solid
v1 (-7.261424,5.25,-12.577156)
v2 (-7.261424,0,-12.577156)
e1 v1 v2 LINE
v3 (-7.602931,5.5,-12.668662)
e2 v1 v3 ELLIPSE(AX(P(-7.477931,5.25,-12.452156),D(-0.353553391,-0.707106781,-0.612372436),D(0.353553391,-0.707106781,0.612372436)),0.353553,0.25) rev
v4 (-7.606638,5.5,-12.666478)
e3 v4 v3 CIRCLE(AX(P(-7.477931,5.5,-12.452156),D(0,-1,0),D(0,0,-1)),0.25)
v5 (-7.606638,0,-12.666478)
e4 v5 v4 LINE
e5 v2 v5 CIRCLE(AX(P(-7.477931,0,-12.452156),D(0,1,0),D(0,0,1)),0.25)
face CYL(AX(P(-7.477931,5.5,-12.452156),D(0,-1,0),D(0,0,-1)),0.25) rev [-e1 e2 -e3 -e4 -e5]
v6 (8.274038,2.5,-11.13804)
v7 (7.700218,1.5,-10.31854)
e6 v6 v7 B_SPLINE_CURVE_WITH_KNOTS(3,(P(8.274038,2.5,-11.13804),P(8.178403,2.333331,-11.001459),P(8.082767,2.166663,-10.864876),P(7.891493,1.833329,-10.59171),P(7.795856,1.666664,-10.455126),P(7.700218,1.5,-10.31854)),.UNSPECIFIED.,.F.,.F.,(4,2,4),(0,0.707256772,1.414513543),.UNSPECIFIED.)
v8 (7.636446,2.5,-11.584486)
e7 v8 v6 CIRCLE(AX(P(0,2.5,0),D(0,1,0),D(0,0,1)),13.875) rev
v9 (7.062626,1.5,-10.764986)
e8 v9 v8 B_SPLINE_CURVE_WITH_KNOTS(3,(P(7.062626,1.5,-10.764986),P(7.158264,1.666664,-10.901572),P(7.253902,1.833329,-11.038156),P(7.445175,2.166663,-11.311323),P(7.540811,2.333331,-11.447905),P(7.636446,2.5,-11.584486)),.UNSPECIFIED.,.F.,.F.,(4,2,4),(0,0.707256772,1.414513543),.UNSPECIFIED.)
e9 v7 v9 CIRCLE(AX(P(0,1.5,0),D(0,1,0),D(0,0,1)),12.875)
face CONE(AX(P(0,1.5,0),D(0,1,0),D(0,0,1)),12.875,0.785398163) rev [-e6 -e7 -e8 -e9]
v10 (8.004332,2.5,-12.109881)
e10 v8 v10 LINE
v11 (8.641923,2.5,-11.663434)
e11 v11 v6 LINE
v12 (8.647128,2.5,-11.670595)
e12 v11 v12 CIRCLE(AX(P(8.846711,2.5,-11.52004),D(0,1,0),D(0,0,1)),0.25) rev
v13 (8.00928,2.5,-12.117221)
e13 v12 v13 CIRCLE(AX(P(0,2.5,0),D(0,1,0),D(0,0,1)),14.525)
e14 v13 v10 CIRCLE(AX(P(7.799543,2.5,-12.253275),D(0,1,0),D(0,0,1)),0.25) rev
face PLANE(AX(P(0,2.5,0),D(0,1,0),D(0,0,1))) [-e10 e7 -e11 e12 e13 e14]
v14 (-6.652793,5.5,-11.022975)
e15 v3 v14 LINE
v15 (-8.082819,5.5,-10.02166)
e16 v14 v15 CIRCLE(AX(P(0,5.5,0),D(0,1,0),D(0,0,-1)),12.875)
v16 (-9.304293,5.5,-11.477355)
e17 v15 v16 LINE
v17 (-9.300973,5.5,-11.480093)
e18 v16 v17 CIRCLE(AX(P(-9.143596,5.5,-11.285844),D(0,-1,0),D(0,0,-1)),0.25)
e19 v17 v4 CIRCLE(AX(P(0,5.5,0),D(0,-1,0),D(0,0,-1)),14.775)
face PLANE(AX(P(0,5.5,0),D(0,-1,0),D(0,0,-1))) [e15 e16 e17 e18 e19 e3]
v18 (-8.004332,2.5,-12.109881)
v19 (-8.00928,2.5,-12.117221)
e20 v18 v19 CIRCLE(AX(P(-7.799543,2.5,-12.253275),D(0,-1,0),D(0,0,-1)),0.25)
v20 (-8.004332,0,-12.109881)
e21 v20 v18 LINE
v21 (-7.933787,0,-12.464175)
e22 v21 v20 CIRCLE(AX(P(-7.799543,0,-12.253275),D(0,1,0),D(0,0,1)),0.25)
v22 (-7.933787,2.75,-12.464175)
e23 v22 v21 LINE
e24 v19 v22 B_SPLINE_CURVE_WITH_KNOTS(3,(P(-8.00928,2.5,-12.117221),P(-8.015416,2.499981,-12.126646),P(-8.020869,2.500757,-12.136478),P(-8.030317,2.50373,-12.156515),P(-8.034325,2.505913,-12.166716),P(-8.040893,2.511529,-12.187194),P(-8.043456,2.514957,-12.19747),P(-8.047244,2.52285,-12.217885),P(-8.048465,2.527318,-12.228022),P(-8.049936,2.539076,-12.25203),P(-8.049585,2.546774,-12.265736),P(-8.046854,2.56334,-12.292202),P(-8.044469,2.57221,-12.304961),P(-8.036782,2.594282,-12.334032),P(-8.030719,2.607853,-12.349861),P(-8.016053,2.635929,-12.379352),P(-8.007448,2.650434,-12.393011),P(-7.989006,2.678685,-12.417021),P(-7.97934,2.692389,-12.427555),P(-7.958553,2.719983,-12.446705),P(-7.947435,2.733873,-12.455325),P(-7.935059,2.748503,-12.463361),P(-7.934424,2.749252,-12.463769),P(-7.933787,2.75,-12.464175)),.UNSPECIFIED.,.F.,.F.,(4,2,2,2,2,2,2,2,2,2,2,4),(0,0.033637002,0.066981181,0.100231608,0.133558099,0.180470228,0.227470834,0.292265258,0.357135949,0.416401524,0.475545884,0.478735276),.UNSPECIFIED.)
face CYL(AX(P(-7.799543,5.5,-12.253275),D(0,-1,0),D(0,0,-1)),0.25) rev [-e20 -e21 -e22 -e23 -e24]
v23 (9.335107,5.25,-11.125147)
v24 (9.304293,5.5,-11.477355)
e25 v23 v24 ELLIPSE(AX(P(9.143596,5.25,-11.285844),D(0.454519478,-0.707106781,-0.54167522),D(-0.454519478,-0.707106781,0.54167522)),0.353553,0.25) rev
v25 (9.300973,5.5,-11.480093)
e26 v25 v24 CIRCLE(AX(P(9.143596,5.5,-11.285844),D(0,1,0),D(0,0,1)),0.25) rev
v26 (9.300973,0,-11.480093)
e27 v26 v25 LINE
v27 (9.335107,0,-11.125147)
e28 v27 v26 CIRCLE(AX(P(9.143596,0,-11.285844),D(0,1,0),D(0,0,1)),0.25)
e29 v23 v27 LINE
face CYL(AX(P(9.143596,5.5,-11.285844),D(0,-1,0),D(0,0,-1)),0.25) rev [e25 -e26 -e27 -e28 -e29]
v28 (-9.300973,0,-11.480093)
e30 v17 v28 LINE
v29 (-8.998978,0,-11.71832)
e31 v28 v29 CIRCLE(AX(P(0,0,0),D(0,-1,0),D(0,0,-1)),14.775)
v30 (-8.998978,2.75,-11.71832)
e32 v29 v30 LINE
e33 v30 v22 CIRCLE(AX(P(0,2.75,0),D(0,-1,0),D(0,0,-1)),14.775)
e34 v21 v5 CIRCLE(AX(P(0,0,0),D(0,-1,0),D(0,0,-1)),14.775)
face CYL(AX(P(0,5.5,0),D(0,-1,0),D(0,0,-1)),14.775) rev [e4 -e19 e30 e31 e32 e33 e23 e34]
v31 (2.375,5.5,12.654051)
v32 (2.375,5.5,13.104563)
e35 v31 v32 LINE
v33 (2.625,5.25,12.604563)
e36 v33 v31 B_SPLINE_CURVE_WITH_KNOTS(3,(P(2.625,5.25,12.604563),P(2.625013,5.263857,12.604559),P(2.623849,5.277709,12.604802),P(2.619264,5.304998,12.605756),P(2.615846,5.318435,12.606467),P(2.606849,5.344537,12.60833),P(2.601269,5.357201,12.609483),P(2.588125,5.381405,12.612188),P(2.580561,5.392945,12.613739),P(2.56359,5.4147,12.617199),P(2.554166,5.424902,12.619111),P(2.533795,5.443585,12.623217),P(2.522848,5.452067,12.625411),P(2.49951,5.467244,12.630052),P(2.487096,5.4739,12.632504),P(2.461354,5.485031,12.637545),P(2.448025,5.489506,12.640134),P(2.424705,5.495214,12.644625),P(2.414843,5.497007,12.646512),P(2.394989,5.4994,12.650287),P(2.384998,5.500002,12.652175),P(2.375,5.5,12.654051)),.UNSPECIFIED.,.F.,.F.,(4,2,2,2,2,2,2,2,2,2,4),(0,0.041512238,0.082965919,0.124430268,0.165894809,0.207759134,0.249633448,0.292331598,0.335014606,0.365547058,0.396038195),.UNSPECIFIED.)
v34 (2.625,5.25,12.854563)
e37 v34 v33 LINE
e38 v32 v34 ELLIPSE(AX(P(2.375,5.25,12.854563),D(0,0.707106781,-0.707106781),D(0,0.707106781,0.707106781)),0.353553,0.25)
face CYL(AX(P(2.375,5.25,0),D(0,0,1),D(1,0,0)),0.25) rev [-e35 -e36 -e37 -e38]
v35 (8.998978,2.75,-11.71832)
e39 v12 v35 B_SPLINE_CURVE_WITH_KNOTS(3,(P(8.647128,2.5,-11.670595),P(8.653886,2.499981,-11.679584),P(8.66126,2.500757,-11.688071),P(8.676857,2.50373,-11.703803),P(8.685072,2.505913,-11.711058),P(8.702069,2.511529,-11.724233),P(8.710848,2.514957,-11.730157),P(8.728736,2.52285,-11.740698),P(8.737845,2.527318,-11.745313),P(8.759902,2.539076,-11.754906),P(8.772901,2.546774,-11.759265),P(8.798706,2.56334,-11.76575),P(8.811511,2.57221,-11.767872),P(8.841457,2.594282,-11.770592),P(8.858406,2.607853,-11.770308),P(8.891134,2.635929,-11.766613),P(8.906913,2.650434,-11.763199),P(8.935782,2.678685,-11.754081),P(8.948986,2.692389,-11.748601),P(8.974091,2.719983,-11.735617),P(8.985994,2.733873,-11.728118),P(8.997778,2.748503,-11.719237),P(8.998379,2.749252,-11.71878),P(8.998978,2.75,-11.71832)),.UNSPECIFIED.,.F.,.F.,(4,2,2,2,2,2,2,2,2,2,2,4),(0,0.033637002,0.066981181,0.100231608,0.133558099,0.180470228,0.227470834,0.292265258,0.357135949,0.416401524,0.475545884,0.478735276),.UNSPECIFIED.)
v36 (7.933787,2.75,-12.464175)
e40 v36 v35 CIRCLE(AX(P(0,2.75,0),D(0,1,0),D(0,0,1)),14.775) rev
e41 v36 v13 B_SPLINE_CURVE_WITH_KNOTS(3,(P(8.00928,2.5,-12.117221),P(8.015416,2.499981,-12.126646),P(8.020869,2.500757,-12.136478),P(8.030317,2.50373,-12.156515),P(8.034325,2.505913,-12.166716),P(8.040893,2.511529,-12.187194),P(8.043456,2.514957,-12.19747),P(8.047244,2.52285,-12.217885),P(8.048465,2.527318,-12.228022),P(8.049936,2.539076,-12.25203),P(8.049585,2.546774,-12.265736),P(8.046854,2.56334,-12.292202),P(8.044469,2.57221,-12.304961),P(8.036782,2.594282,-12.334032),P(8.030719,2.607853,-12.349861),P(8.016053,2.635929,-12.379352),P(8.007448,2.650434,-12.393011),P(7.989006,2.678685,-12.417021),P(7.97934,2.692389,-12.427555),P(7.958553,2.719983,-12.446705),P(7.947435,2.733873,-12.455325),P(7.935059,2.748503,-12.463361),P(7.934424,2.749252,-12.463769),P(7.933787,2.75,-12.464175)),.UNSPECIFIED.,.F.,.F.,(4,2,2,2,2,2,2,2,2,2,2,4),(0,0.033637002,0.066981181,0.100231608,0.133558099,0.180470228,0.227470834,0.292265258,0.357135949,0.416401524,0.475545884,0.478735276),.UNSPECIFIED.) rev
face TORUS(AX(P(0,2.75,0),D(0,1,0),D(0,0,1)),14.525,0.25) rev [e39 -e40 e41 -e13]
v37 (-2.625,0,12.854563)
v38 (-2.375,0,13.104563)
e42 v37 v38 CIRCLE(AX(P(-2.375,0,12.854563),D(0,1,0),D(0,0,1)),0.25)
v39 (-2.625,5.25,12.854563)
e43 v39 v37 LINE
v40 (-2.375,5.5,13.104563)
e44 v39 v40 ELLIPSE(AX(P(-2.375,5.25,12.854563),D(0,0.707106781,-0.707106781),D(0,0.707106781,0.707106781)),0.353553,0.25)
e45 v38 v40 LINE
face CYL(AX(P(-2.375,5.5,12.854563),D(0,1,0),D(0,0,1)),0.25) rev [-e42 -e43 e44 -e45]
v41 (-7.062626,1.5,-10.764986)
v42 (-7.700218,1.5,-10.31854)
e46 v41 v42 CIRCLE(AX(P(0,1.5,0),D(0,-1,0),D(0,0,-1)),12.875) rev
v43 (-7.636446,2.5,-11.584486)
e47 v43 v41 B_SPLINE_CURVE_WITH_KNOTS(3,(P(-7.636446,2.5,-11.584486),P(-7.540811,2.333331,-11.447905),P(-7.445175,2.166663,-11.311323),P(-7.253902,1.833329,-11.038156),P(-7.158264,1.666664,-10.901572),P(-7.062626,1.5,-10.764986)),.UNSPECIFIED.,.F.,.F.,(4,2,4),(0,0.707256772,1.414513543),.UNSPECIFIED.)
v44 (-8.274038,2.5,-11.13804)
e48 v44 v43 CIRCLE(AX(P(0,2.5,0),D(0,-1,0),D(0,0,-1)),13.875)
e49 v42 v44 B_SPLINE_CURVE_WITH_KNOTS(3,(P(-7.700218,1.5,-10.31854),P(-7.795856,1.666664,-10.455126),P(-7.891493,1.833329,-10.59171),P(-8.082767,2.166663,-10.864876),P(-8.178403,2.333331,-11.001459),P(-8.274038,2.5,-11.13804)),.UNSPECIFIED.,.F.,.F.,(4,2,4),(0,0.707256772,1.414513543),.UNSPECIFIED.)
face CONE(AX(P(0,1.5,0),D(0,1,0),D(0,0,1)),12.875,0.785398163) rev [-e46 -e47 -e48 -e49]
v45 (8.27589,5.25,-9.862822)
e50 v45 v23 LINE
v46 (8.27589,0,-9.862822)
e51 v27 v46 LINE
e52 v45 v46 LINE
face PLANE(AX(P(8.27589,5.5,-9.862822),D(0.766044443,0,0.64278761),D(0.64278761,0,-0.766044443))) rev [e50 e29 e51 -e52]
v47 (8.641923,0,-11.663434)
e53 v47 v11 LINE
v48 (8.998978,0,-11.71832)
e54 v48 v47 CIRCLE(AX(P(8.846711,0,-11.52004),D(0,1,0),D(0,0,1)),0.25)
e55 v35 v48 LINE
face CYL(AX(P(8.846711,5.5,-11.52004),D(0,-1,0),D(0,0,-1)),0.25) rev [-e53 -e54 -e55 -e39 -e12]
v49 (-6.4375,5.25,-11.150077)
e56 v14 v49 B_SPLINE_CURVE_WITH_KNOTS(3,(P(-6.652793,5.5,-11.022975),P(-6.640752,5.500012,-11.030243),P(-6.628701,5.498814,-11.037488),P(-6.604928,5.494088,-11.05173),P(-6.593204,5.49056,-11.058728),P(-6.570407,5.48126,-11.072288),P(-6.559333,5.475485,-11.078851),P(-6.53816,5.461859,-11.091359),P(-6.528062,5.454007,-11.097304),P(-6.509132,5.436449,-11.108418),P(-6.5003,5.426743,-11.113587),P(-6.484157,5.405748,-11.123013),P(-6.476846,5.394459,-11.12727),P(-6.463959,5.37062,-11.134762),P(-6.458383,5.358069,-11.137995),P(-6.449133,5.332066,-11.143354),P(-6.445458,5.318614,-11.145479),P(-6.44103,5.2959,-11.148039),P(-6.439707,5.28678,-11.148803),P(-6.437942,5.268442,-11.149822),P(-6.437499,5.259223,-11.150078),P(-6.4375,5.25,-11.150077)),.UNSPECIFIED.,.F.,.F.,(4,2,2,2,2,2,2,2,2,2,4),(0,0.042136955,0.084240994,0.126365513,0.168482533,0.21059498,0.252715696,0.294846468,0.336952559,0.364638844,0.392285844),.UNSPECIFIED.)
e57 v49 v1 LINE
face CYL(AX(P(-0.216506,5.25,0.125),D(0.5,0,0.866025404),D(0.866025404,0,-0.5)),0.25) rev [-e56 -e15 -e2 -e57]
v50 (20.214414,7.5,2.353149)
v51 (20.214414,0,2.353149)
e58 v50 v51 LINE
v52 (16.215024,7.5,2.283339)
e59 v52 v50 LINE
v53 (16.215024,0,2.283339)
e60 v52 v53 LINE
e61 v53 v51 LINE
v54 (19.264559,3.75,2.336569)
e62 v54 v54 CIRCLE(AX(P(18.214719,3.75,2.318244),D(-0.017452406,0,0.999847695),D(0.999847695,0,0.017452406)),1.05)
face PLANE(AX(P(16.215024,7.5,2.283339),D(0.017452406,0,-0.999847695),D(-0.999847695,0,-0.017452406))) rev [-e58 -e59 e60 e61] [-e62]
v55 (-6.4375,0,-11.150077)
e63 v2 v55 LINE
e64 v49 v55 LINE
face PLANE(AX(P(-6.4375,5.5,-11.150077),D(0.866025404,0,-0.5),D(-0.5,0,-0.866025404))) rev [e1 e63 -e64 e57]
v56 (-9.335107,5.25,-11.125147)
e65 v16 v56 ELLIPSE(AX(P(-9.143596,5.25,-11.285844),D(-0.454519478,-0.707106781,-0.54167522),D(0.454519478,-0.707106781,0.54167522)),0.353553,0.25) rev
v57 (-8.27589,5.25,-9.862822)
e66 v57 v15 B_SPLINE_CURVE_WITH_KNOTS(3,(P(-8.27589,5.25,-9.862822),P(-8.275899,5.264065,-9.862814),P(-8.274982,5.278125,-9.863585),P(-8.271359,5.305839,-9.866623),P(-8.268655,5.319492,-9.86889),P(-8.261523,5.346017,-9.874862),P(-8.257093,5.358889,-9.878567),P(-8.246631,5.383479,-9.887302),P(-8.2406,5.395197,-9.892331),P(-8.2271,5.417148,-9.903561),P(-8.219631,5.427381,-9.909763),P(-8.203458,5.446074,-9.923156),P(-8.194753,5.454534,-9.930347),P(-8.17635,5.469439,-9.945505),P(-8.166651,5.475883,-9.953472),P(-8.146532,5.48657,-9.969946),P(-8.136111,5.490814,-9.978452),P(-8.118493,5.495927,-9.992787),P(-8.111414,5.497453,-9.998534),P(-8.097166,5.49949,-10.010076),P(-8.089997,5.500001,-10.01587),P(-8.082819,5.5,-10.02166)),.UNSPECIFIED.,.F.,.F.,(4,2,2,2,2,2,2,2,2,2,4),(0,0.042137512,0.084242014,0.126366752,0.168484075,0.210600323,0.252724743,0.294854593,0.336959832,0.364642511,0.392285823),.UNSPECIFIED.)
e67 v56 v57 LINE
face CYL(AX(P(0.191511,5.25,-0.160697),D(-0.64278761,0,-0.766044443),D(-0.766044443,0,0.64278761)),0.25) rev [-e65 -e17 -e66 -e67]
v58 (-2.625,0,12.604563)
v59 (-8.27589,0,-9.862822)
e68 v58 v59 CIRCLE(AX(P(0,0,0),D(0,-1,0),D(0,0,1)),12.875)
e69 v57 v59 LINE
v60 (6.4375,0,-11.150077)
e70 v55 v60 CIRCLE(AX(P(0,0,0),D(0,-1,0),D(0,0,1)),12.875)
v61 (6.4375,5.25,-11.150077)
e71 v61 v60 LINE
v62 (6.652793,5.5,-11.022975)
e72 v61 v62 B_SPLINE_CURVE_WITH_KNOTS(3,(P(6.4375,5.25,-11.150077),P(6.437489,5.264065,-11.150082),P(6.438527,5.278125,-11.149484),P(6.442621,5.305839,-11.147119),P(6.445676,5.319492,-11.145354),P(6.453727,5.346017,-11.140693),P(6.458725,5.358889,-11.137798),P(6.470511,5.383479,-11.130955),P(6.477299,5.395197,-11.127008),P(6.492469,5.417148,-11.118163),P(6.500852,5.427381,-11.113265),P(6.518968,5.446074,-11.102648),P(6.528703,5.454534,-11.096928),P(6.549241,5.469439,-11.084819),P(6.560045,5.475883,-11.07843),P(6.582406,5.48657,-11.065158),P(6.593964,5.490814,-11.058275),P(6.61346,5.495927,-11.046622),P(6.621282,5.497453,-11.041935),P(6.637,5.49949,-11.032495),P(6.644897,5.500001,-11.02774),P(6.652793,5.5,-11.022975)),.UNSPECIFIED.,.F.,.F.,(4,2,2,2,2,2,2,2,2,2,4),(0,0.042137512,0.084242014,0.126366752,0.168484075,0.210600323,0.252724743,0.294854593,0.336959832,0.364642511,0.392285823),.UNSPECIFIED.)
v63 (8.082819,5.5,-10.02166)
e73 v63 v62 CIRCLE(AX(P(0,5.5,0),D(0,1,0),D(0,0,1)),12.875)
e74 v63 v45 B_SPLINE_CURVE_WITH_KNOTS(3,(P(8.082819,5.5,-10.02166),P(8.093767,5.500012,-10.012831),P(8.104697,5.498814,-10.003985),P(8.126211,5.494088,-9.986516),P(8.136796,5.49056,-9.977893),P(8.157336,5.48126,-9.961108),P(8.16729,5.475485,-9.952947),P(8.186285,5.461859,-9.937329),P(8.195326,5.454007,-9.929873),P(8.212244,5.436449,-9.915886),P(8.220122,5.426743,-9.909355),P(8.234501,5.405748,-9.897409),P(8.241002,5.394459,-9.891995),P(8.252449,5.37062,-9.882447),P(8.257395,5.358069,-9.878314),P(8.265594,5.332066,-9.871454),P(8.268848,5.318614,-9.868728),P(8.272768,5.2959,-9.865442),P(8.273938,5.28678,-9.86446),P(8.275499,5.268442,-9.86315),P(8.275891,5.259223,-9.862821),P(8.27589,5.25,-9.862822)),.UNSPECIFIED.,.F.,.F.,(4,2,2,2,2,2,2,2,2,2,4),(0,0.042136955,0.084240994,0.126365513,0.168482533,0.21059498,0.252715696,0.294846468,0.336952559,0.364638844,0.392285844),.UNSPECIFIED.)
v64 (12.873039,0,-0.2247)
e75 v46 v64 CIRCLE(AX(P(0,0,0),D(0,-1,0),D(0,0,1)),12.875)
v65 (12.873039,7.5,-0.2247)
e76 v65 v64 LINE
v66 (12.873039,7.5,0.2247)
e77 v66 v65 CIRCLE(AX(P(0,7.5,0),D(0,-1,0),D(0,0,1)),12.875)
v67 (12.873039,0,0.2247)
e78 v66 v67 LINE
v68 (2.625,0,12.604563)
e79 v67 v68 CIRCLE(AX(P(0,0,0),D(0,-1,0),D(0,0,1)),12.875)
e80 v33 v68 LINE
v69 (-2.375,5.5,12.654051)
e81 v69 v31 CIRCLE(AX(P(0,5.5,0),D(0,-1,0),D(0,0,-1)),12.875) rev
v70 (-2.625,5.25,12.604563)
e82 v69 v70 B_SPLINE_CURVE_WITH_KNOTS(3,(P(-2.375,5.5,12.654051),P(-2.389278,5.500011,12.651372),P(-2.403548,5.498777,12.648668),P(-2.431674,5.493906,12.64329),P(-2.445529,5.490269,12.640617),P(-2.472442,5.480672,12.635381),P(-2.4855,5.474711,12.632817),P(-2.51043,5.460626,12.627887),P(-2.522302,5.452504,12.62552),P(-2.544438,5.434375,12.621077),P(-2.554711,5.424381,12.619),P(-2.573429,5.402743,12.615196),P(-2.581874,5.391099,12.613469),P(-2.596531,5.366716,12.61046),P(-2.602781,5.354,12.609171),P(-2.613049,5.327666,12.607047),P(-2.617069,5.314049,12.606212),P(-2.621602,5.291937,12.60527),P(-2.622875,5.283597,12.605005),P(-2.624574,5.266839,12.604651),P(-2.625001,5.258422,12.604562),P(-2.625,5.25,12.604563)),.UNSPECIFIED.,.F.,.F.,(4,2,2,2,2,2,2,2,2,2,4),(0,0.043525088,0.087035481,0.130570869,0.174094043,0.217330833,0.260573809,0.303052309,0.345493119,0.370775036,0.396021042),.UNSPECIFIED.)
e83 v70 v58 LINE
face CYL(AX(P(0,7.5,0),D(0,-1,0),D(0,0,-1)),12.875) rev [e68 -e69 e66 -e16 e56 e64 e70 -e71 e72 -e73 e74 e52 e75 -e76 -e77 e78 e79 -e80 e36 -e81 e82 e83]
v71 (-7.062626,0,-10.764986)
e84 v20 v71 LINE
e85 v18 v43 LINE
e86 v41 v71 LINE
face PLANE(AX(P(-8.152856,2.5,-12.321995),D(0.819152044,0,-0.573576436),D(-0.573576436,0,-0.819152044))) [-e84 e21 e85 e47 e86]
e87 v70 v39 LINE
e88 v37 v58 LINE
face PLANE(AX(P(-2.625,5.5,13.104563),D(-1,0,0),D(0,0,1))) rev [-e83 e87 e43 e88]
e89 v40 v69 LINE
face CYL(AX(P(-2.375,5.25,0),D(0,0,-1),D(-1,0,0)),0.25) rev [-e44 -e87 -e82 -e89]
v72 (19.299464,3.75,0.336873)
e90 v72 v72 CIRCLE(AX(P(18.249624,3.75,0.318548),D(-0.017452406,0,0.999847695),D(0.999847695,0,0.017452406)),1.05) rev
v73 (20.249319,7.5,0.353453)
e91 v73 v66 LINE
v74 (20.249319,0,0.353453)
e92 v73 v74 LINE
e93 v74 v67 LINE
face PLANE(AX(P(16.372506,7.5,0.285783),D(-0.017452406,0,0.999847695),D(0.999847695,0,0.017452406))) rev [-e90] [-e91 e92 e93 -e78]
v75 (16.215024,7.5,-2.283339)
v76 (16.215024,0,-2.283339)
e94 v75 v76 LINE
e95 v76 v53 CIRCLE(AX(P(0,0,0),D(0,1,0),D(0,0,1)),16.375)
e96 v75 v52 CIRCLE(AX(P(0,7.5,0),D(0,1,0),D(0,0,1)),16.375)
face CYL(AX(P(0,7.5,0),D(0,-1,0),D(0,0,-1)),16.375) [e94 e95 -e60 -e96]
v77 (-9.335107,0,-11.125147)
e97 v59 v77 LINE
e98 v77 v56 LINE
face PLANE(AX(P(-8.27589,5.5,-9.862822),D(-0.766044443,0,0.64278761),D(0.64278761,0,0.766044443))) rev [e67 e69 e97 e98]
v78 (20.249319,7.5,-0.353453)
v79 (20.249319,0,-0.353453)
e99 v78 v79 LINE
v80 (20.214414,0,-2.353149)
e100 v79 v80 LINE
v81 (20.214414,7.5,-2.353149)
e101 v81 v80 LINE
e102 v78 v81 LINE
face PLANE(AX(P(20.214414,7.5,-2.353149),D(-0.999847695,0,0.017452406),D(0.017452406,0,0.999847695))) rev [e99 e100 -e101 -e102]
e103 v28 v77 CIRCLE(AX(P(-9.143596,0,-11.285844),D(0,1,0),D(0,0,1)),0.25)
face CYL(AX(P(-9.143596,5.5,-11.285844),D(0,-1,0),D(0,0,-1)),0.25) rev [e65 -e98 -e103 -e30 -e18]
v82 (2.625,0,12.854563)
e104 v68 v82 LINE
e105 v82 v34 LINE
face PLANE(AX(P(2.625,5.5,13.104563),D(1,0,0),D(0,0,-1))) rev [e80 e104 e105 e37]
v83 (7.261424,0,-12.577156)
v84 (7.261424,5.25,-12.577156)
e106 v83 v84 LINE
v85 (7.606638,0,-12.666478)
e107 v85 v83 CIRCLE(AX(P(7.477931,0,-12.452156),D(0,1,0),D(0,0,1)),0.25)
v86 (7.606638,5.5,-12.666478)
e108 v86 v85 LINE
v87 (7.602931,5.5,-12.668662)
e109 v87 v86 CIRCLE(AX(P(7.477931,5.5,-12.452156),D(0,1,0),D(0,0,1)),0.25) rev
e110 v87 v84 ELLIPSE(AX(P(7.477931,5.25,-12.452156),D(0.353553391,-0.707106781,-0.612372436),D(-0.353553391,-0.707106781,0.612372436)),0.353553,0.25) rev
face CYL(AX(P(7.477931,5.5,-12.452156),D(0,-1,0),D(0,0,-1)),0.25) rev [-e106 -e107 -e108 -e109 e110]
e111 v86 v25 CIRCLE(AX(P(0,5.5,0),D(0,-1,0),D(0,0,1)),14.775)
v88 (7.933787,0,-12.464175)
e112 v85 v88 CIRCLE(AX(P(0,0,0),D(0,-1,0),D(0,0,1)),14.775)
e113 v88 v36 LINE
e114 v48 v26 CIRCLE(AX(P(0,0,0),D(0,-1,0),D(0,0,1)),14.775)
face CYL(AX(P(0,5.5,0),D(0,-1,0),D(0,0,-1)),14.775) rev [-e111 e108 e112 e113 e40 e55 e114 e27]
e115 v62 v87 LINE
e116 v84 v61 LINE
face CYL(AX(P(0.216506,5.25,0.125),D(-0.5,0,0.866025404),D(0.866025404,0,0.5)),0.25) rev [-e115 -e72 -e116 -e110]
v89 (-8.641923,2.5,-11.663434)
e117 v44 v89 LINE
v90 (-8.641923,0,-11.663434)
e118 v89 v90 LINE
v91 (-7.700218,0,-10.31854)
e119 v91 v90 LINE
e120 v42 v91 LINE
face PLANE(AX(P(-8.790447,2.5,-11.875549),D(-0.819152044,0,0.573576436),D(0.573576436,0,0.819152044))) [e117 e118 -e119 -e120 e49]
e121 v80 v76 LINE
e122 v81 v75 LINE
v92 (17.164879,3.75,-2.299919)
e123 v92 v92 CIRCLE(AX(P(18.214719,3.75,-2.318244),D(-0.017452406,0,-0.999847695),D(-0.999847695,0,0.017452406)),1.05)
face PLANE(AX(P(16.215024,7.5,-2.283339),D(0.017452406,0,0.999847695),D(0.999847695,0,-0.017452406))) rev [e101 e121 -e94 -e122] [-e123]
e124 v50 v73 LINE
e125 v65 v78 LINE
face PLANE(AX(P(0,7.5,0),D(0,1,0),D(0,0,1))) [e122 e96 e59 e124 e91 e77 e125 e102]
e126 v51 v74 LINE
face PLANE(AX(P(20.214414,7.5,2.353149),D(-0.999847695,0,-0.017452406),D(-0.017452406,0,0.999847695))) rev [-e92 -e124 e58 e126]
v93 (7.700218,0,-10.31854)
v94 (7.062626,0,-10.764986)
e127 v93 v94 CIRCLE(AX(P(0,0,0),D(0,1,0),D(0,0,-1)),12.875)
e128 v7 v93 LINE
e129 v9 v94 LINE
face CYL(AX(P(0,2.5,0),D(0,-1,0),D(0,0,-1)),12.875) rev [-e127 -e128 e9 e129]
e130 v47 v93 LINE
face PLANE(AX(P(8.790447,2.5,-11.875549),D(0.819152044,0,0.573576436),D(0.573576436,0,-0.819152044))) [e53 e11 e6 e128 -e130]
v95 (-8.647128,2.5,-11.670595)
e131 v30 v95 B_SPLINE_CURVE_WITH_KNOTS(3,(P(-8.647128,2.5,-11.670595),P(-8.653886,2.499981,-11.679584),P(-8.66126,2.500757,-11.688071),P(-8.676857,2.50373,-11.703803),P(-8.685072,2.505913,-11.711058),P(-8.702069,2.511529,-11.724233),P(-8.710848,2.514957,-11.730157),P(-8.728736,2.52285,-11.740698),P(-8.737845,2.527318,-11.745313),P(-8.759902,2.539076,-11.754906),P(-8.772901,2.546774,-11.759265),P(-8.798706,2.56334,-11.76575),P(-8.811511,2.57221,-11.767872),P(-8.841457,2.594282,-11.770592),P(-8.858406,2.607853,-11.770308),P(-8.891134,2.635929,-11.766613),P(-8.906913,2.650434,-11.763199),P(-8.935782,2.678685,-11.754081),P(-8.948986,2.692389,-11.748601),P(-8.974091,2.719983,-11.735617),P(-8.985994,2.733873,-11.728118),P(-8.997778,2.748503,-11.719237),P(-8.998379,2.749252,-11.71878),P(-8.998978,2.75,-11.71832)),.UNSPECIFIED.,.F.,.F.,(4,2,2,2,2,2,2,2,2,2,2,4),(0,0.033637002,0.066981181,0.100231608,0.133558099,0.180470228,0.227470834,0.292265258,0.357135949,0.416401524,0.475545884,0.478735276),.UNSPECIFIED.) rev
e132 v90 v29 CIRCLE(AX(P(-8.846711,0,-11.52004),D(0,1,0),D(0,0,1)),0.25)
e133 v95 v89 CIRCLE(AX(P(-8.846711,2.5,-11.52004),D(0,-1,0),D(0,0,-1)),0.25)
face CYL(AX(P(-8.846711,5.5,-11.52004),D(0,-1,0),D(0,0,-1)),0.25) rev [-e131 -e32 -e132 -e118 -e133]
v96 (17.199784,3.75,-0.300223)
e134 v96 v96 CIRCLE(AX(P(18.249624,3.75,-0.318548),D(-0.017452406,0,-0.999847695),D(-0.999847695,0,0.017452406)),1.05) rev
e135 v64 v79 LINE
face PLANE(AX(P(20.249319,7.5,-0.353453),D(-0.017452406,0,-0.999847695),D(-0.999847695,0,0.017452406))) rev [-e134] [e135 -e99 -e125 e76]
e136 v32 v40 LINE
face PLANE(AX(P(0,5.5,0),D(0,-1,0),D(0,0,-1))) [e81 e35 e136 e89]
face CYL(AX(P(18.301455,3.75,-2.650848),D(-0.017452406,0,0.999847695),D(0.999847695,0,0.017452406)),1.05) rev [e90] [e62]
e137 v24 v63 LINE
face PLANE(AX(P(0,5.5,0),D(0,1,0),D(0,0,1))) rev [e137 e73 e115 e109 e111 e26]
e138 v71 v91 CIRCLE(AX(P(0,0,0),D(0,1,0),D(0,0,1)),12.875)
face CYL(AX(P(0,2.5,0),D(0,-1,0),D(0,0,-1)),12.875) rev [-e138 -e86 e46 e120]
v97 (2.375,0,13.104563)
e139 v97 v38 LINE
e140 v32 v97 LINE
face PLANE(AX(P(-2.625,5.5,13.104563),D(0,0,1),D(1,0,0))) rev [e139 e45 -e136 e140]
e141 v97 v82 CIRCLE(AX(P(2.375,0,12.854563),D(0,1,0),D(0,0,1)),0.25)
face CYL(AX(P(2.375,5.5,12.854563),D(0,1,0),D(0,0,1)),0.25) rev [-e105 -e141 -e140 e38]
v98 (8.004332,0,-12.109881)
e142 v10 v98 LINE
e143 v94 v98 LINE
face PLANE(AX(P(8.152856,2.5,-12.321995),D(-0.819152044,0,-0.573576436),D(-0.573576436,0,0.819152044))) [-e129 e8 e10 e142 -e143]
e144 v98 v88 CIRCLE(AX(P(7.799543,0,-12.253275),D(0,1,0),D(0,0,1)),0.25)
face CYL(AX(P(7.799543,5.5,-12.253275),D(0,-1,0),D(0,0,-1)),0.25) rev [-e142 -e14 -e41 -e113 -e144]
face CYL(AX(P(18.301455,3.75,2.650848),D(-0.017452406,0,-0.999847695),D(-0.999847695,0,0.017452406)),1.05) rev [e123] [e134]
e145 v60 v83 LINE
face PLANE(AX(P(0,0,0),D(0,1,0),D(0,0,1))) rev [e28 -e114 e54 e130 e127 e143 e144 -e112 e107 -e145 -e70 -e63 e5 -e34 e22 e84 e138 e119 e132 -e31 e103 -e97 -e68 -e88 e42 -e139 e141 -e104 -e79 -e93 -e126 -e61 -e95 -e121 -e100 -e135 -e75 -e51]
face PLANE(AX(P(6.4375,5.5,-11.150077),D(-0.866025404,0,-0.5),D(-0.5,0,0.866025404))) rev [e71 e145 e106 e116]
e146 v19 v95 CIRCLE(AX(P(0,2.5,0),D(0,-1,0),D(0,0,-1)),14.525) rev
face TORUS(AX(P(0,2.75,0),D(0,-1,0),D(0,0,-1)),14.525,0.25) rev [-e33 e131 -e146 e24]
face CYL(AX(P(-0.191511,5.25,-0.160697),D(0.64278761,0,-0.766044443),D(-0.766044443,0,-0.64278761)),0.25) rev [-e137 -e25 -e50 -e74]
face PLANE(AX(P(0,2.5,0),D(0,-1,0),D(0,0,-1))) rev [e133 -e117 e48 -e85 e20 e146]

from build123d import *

# Parameters (mm, degrees)
BOSS_EXTRUDE1_DEPTH = 7.5
SKETCH2_R           = 1.05
CUT_EXTRUDE1_DEPTH  = 2
SKETCH3_R           = 1.05
CUT_EXTRUDE2_DEPTH  = 2
SKETCH4_W           = 5.25
SKETCH4_H           = 0.5
CUT_EXTRUDE3_DEPTH  = 5.5
BOSS_EXTRUDE2_DEPTH = 2.5
FILLET1_R           = 0.25
CHAMFER1_SIZE       = 1


with BuildPart() as part:
    # Sketch1 → Boss-Extrude1 (new body)
    with BuildSketch(Plane(origin=(0, 0, 0), x_dir=(1, 0, 0), z_dir=(0, 1, 0))):
        with BuildLine():
            Line((16.215023536, 2.283338945), (20.214414316, 2.35314857))
            Line((20.214414316, 2.35314857), (20.249319129, 0.35345318))
            Line((20.249319129, 0.35345318), (16.372506008, 0.285783155))
            Line((16.372506008, 0.285783155), (12.873039075, 0.224699733))
            ThreePointArc((12.873039075, 0.224699733), (-12.875, 0), (12.873039075, -0.224699733))
            Line((12.873039075, -0.224699733), (16.372506008, -0.285783155))
            Line((16.372506008, -0.285783155), (20.249319129, -0.35345318))
            Line((20.249319129, -0.35345318), (20.214414316, -2.35314857))
            Line((20.214414316, -2.35314857), (16.215023536, -2.283338945))
            ThreePointArc((16.215023536, -2.283338945), (-16.375, 0), (16.215023536, 2.283338945))
        make_face()
    extrude(amount=BOSS_EXTRUDE1_DEPTH)

    # Sketch2 → Cut-Extrude1 (cut)
    with BuildSketch(Plane(origin=(-0.034904813, 0, 1.99969539), x_dir=(0.9998476951563915, 0, 0.01745240643727699), z_dir=(-0.01745240643727699, 0, 0.9998476951563915))):
        with Locations((18.252403668, 3.75)):
            Circle(SKETCH2_R)
    extrude(amount=-CUT_EXTRUDE1_DEPTH, mode=Mode.SUBTRACT)

    # Sketch3 → Cut-Extrude2 (cut)
    with BuildSketch(Plane(origin=(-0.034904813, 0, -1.99969539), x_dir=(-0.9998476951563915, 0, 0.01745240643727699), z_dir=(-0.01745240643727699, 0, -0.9998476951563915))):
        with Locations((-18.252403668, 3.75)):
            Circle(SKETCH3_R)
    extrude(amount=-CUT_EXTRUDE2_DEPTH, mode=Mode.SUBTRACT)

    # Sketch4 → Cut-Extrude3 (cut)
    with BuildSketch(Plane.XZ):
        with BuildLine():
            Line((-8.275890475, -9.862822205), (-9.497186933, -11.318306647))
            ThreePointArc((-9.497186933, -11.318306647), (-8.474591847, -12.102971454), (-7.3875, -12.795525341))
            Line((-7.3875, -12.795525341), (-6.4375, -11.150077074))
            ThreePointArc((-6.4375, -11.150077074), (-7.384796618, -10.54658257), (-8.275890475, -9.862822205))
        make_face()
        with BuildLine():
            Line((8.275890475, -9.862822205), (9.497186933, -11.318306647))
            ThreePointArc((9.497186933, -11.318306647), (8.474591847, -12.102971454), (7.3875, -12.795525341))
            Line((7.3875, -12.795525341), (6.4375, -11.150077074))
            ThreePointArc((6.4375, -11.150077074), (7.384796618, -10.54658257), (8.275890475, -9.862822205))
        make_face()
        with Locations((0, 12.854562666)):
            Rectangle(SKETCH4_W, SKETCH4_H)
    extrude(amount=-CUT_EXTRUDE3_DEPTH, mode=Mode.SUBTRACT)

    # Sketch5 → Boss-Extrude2 (add)
    with BuildSketch(Plane.XZ):
        with BuildLine():
            Line((8.152855692, -12.321995336), (7.062626355, -10.764986482))
            ThreePointArc((7.062626355, -10.764986482), (7.384796618, -10.54658257), (7.700217882, -10.318540089))
            Line((7.700217882, -10.318540089), (8.790447219, -11.875548943))
            ThreePointArc((8.790447219, -11.875548943), (8.474591847, -12.102971454), (8.152855692, -12.321995336))
        make_face()
        with BuildLine():
            Line((-8.790447219, -11.875548943), (-7.700217882, -10.318540089))
            ThreePointArc((-7.700217882, -10.318540089), (-7.384796618, -10.54658257), (-7.062626355, -10.764986482))
            Line((-7.062626355, -10.764986482), (-8.152855692, -12.321995336))
            ThreePointArc((-8.152855692, -12.321995336), (-8.474591847, -12.102971454), (-8.790447219, -11.875548943))
        make_face()
    extrude(amount=-BOSS_EXTRUDE2_DEPTH)

    # Fillet1
    # the kernel refuses this fillet: 0.25 mm, written as the material it adds along each edge
    with BuildSketch(Plane(origin=(0, 2.5, 0), x_dir=(0.62841176473142, 0, -0.777880873879248), z_dir=(0.777880873879248, 0, 0.62841176473142))) as fillet1_piece_1_section:
        with BuildLine():
            CenterArc((14.775 - FILLET1_R, FILLET1_R), FILLET1_R, 270, 90)
            Line((14.775 - FILLET1_R, 0), (14.775, 0))
            Line((14.775, 0), (14.775, FILLET1_R))
        make_face()
    fillet1_piece_1 = revolve(axis=Axis((0, 2.5, 0), (0, 1, 0)), revolution_arc=7.866084762, mode=Mode.PRIVATE)
    fillet1_piece_1 = split(fillet1_piece_1, bisect_by=Plane(origin=(8.759939705, 2.55659864, -11.831979697), z_dir=(-0.8191520442889932, 0, -0.573576436351044)), keep=Keep.TOP, mode=Mode.PRIVATE)
    fillet1_piece_1 = split(fillet1_piece_1, bisect_by=Plane(origin=(8.122348177, 2.55659864, -12.278426091), z_dir=(0.8191520442889957, 0, 0.5735764363510407)), keep=Keep.TOP, mode=Mode.PRIVATE)
    add(fillet1_piece_1)
    with BuildSketch(Plane(origin=(8.790447219, 0, -11.875548943), x_dir=(0.7984700606490586, 0, 0.6020345191491006), z_dir=(0, 1, 0)), Plane(origin=(-8.152855692, 0, -12.321995336), x_dir=(0.8388202396872455, 0, -0.5444084913840267), z_dir=(0, 1, 0))) as fillet1_piece_2:
        with BuildLine():
            CenterArc((0.258953447, -0.249990236), FILLET1_R, 89.493613217, 92.522135515)
            Line((0.009108148, -0.258783785), (0, 0))
            ThreePointArc((0, 0), (0.130581474, 0.000577051), (0.261162947, 0))
        make_face()
    extrude(amount=2.5)
    with BuildSketch(Plane(origin=(8.152855692, 0, -12.321995336), x_dir=(-0.8388202396872467, 0, -0.5444084913840251), z_dir=(0, 1, 0)), Plane(origin=(-8.790447219, 0, -11.875548943), x_dir=(-0.7984700606490618, 0, 0.6020345191490962), z_dir=(0, 1, 0))) as fillet1_piece_3:
        with BuildLine():
            CenterArc((0.258953447, 0.249990236), FILLET1_R, 177.984251268, 92.522135515)
            Line((0.009108148, 0.258783785), (0, 0))
            ThreePointArc((0, 0), (0.130581474, -0.000577051), (0.261162947, 0))
        make_face()
    extrude(amount=2.5)
    with BuildSketch(Plane(origin=(-2.625, 5.5, 11.979562666), x_dir=(0, -1, 0), z_dir=(0, 0, 1))) as fillet1_piece_4_section:
        with BuildLine():
            CenterArc((FILLET1_R, FILLET1_R), FILLET1_R, 180, 90)
            Line((0, FILLET1_R), (0, 0))
            Line((0, 0), (FILLET1_R, 0))
        make_face()
    fillet1_piece_4 = extrude(amount=1.75, mode=Mode.PRIVATE)
    fillet1_piece_4 = fillet1_piece_4 - Plane(origin=(0, 5.442690928, 0), x_dir=(0.9998476951563914, 0, -0.01745240643727672), z_dir=(0, -1, 0)) * Cylinder(12.875, 5, mode=Mode.PRIVATE)
    add(fillet1_piece_4)
    with BuildSketch(Plane(origin=(-2.625, 0, 13.104562666), x_dir=(1, 0, 0), z_dir=(0, 1, 0)), Plane(origin=(2.625, 0, 13.104562666), x_dir=(0, 0, -1), z_dir=(0, 1, 0))) as fillet1_piece_5:
        with BuildLine():
            CenterArc((FILLET1_R, FILLET1_R), FILLET1_R, 180, 90)
            Line((0, FILLET1_R), (0, 0))
            Line((0, 0), (FILLET1_R, 0))
        make_face()
    extrude(amount=6.125)
    with BuildSketch(Plane(origin=(2.625, 5.5, 13.729562666), x_dir=(0, -1, 0), z_dir=(0, 0, -1))) as fillet1_piece_6_section:
        with BuildLine():
            CenterArc((FILLET1_R, FILLET1_R), FILLET1_R, 180, 90)
            Line((0, FILLET1_R), (0, 0))
            Line((0, 0), (FILLET1_R, 0))
        make_face()
    fillet1_piece_6 = extrude(amount=1.75, mode=Mode.PRIVATE)
    fillet1_piece_6 = fillet1_piece_6 - Plane(origin=(0, 5.443401221, 0), x_dir=(0.9998476951563914, 0, -0.01745240643727672), z_dir=(0, -1, 0)) * Cylinder(12.875, 5, mode=Mode.PRIVATE)
    add(fillet1_piece_6)
    with BuildSketch(Plane(origin=(-7.7, 5.5, -13.336791218), x_dir=(0, -1, 0), z_dir=(0.4999999999999989, 0, 0.8660254037844394))) as fillet1_piece_7_section:
        with BuildLine():
            CenterArc((FILLET1_R, -FILLET1_R), FILLET1_R, 90, 90)
            Line((0, -FILLET1_R), (0, 0))
            Line((0, 0), (FILLET1_R, 0))
        make_face()
    fillet1_piece_7 = extrude(amount=3.15, mode=Mode.PRIVATE)
    fillet1_piece_7 = fillet1_piece_7 - Plane(origin=(0, 5.443414893, 0), x_dir=(0.9998476951563914, 0, -0.01745240643727672), z_dir=(0, -1, 0)) * Cylinder(12.875, 8, mode=Mode.PRIVATE)
    add(fillet1_piece_7)
    with BuildSketch(Plane(origin=(-7.3875, 0, -12.795525341), x_dir=(-0.8616902462472484, 0, 0.5074346455676397), z_dir=(0, 1, 0)), Plane(origin=(9.497186933, 0, -11.318306647), x_dir=(-0.7715480134948484, 0, -0.6361710955962662), z_dir=(0, 1, 0))) as fillet1_piece_8:
        with BuildLine():
            CenterArc((0.252160801, 0.249990742), FILLET1_R, 179.506896654, 90.986206692)
            Line((0.00217006, 0.252142284), (0, 0))
            ThreePointArc((0, 0), (0.127156172, -0.000547174), (0.254312344, 0))
        make_face()
    extrude(amount=6.13578086)
    with BuildSketch(Plane(origin=(-7.874148219, 5.5, -9.384044428), x_dir=(0, -1, 0), z_dir=(-0.6427876096865357, 0, -0.7660444431189812))) as fillet1_piece_9_section:
        with BuildLine():
            CenterArc((FILLET1_R, -FILLET1_R), FILLET1_R, 90, 90)
            Line((0, -FILLET1_R), (0, 0))
            Line((0, 0), (FILLET1_R, 0))
        make_face()
    fillet1_piece_9 = extrude(amount=3.15, mode=Mode.PRIVATE)
    fillet1_piece_9 = fillet1_piece_9 - Plane(origin=(0, 5.443401887, 0), x_dir=(0.9998476951563914, 0, -0.01745240643727672), z_dir=(0, -1, 0)) * Cylinder(12.875, 8, mode=Mode.PRIVATE)
    add(fillet1_piece_9)
    with BuildSketch(Plane(origin=(-9.497186933, 0, -11.318306647), x_dir=(0.6427876096865356, 0, 0.7660444431189811), z_dir=(0, 1, 0)), Plane(origin=(7.3875, 0, -12.795525341), x_dir=(-0.499999999999998, 0, 0.8660254037844396), z_dir=(0, 1, 0))) as fillet1_piece_10:
        with BuildLine():
            CenterArc((0.252151622, 0.25), FILLET1_R, 179.013793308, 90.986206692)
            ThreePointArc((0.002188655, 0.254302926), (0.000547174, 0.127156172), (0, 0))
            Line((0, 0), (0.252151622, 0))
        make_face()
    extrude(amount=6.13578086)
    with BuildSketch(Plane(origin=(7.874148219, 5.5, -9.384044428), x_dir=(0, -1, 0), z_dir=(0.6427876096865357, 0, -0.7660444431189812))) as fillet1_piece_11_section:
        with BuildLine():
            CenterArc((FILLET1_R, FILLET1_R), FILLET1_R, 180, 90)
            Line((0, FILLET1_R), (0, 0))
            Line((0, 0), (FILLET1_R, 0))
        make_face()
    fillet1_piece_11 = extrude(amount=3.15, mode=Mode.PRIVATE)
    fillet1_piece_11 = fillet1_piece_11 - Plane(origin=(0, 5.443401886, 0), x_dir=(0.9998476951563914, 0, -0.01745240643727672), z_dir=(0, -1, 0)) * Cylinder(12.875, 8, mode=Mode.PRIVATE)
    add(fillet1_piece_11)
    with BuildSketch(Plane(origin=(7.7, 5.5, -13.336791218), x_dir=(0, -1, 0), z_dir=(-0.4999999999999989, 0, 0.8660254037844394))) as fillet1_piece_12_section:
        with BuildLine():
            CenterArc((FILLET1_R, FILLET1_R), FILLET1_R, 180, 90)
            Line((0, FILLET1_R), (0, 0))
            Line((0, 0), (FILLET1_R, 0))
        make_face()
    fillet1_piece_12 = extrude(amount=3.15, mode=Mode.PRIVATE)
    fillet1_piece_12 = fillet1_piece_12 - Plane(origin=(0, 5.443414893, 0), x_dir=(0.9998476951563914, 0, -0.01745240643727672), z_dir=(0, -1, 0)) * Cylinder(12.875, 8, mode=Mode.PRIVATE)
    add(fillet1_piece_12)
    with BuildSketch(Plane(origin=(0, 2.5, 0), x_dir=(-0.5160394351938659, 0, -0.856564826107631), z_dir=(0.856564826107631, 0, -0.5160394351938659))) as fillet1_piece_13_section:
        with BuildLine():
            CenterArc((14.775 - FILLET1_R, FILLET1_R), FILLET1_R, 270, 90)
            Line((14.775 - FILLET1_R, 0), (14.775, 0))
            Line((14.775, 0), (14.775, FILLET1_R))
        make_face()
    fillet1_piece_13 = revolve(axis=Axis((0, 2.5, 0), (0, 1, 0)), revolution_arc=7.866084762, mode=Mode.PRIVATE)
    fillet1_piece_13 = split(fillet1_piece_13, bisect_by=Plane(origin=(-8.759939705, 2.55659864, -11.831979697), z_dir=(0.8191520442889937, 0, -0.5735764363510434)), keep=Keep.TOP, mode=Mode.PRIVATE)
    fillet1_piece_13 = split(fillet1_piece_13, bisect_by=Plane(origin=(-8.122348177, 2.55659864, -12.278426091), z_dir=(-0.8191520442889957, 0, 0.5735764363510407)), keep=Keep.TOP, mode=Mode.PRIVATE)
    add(fillet1_piece_13)
    with BuildSketch(Plane(origin=(8.790447219, 0, -11.875548943), x_dir=(0.7984700606490586, 0, 0.6020345191491006), z_dir=(0, 1, 0))) as fillet1_piece_14a_section:
        with BuildLine():
            CenterArc((0.258953447, -0.249990236), FILLET1_R, 89.493613217, 92.522135515)
            Line((0.009108148, -0.258783785), (0, 0))
            ThreePointArc((0, 0), (0.130581474, 0.000577051), (0.261162947, 0))
        make_face()
    fillet1_piece_14a = extrude(amount=3.152907368, mode=Mode.PRIVATE)
    fillet1_piece_14a = split(fillet1_piece_14a, bisect_by=Plane(origin=(8.804363414, 2.5, -11.791834309), z_dir=(0, 1, 0)), keep=Keep.TOP, mode=Mode.PRIVATE)
    with BuildSketch(Plane(origin=(0, 2.5, 0), x_dir=(0.62841176473142, 0, -0.777880873879248), z_dir=(0.777880873879248, 0, 0.62841176473142))) as fillet1_piece_14b_section:
        with BuildLine():
            CenterArc((14.775 - FILLET1_R, FILLET1_R), FILLET1_R, 270, 90)
            Line((14.775 - FILLET1_R, 0), (14.775, 0))
            Line((14.775, 0), (14.775, FILLET1_R))
        make_face()
    fillet1_piece_14b = revolve(axis=Axis((0, 2.5, 0), (0, 1, 0)), revolution_arc=7.866084762, mode=Mode.PRIVATE)
    fillet1_piece_14b = split(fillet1_piece_14b, bisect_by=Plane(origin=(8.750942177, 2.556788389, -11.819129896), z_dir=(0.8191520442889932, 0, 0.573576436351044)), keep=Keep.TOP, mode=Mode.PRIVATE)
    fillet1_piece_14 = fillet1_piece_14a & fillet1_piece_14b
    add(fillet1_piece_14)
    with BuildSketch(Plane(origin=(0, 2.5, 0), x_dir=(0.62841176473142, 0, -0.777880873879248), z_dir=(0.777880873879248, 0, 0.62841176473142))) as fillet1_piece_15a_section:
        with BuildLine():
            CenterArc((14.775 - FILLET1_R, FILLET1_R), FILLET1_R, 270, 90)
            Line((14.775 - FILLET1_R, 0), (14.775, 0))
            Line((14.775, 0), (14.775, FILLET1_R))
        make_face()
    fillet1_piece_15a = revolve(axis=Axis((0, 2.5, 0), (0, 1, 0)), revolution_arc=7.866084762, mode=Mode.PRIVATE)
    fillet1_piece_15a = split(fillet1_piece_15a, bisect_by=Plane(origin=(8.113350762, 2.556788399, -12.26557645), z_dir=(-0.8191520442889957, 0, -0.5735764363510407)), keep=Keep.TOP, mode=Mode.PRIVATE)
    with BuildSketch(Plane(origin=(8.152855692, 0, -12.321995336), x_dir=(-0.8388202396872467, 0, -0.5444084913840251), z_dir=(0, 1, 0))) as fillet1_piece_15b_section:
        with BuildLine():
            CenterArc((0.258953447, 0.249990236), FILLET1_R, 177.984251268, 92.522135515)
            Line((0.009108148, 0.258783785), (0, 0))
            ThreePointArc((0, 0), (0.130581474, -0.000577051), (0.261162947, 0))
        make_face()
    fillet1_piece_15b = extrude(amount=3.152907368, mode=Mode.PRIVATE)
    fillet1_piece_15b = split(fillet1_piece_15b, bisect_by=Plane(origin=(8.069430049, 2.5, -12.306440191), z_dir=(0, 1, 0)), keep=Keep.TOP, mode=Mode.PRIVATE)
    fillet1_piece_15 = fillet1_piece_15a & fillet1_piece_15b
    add(fillet1_piece_15)
    with BuildSketch(Plane(origin=(0, 2.5, 0), x_dir=(-0.5160394351938659, 0, -0.856564826107631), z_dir=(0.856564826107631, 0, -0.5160394351938659))) as fillet1_piece_16a_section:
        with BuildLine():
            CenterArc((14.775 - FILLET1_R, FILLET1_R), FILLET1_R, 270, 90)
            Line((14.775 - FILLET1_R, 0), (14.775, 0))
            Line((14.775, 0), (14.775, FILLET1_R))
        make_face()
    fillet1_piece_16a = revolve(axis=Axis((0, 2.5, 0), (0, 1, 0)), revolution_arc=7.866084762, mode=Mode.PRIVATE)
    fillet1_piece_16a = split(fillet1_piece_16a, bisect_by=Plane(origin=(-8.11335065, 2.556788389, -12.26557629), z_dir=(0.8191520442889957, 0, -0.5735764363510407)), keep=Keep.TOP, mode=Mode.PRIVATE)
    with BuildSketch(Plane(origin=(-8.152855692, 0, -12.321995336), x_dir=(0.8388202396872455, 0, -0.5444084913840267), z_dir=(0, 1, 0))) as fillet1_piece_16b_section:
        with BuildLine():
            CenterArc((0.258953447, -0.249990236), FILLET1_R, 89.493613217, 92.522135515)
            Line((0.009108148, -0.258783785), (0, 0))
            ThreePointArc((0, 0), (0.130581474, 0.000577051), (0.261162947, 0))
        make_face()
    fillet1_piece_16b = extrude(amount=3.152907368, mode=Mode.PRIVATE)
    fillet1_piece_16b = split(fillet1_piece_16b, bisect_by=Plane(origin=(-8.069430049, 2.5, -12.306440191), z_dir=(0, 1, 0)), keep=Keep.TOP, mode=Mode.PRIVATE)
    fillet1_piece_16 = fillet1_piece_16a & fillet1_piece_16b
    add(fillet1_piece_16)
    with BuildSketch(Plane(origin=(-8.790447219, 0, -11.875548943), x_dir=(-0.7984700606490618, 0, 0.6020345191490962), z_dir=(0, 1, 0))) as fillet1_piece_17a_section:
        with BuildLine():
            CenterArc((0.258953447, 0.249990236), FILLET1_R, 177.984251268, 92.522135515)
            Line((0.009108148, 0.258783785), (0, 0))
            ThreePointArc((0, 0), (0.130581474, -0.000577051), (0.261162947, 0))
        make_face()
    fillet1_piece_17a = extrude(amount=3.152907368, mode=Mode.PRIVATE)
    fillet1_piece_17a = split(fillet1_piece_17a, bisect_by=Plane(origin=(-8.804363414, 2.5, -11.791834309), z_dir=(0, 1, 0)), keep=Keep.TOP, mode=Mode.PRIVATE)
    with BuildSketch(Plane(origin=(0, 2.5, 0), x_dir=(-0.5160394351938659, 0, -0.856564826107631), z_dir=(0.856564826107631, 0, -0.5160394351938659))) as fillet1_piece_17b_section:
        with BuildLine():
            CenterArc((14.775 - FILLET1_R, FILLET1_R), FILLET1_R, 270, 90)
            Line((14.775 - FILLET1_R, 0), (14.775, 0))
            Line((14.775, 0), (14.775, FILLET1_R))
        make_face()
    fillet1_piece_17b = revolve(axis=Axis((0, 2.5, 0), (0, 1, 0)), revolution_arc=7.866084762, mode=Mode.PRIVATE)
    fillet1_piece_17b = split(fillet1_piece_17b, bisect_by=Plane(origin=(-8.750942289, 2.556788399, -11.819130056), z_dir=(-0.8191520442889937, 0, 0.5735764363510434)), keep=Keep.TOP, mode=Mode.PRIVATE)
    fillet1_piece_17 = fillet1_piece_17a & fillet1_piece_17b
    add(fillet1_piece_17)

    # Chamfer1
    chamfer1_edges = [part.edges().sort_by_distance(p)[0] for p in [
        (7.384796618, 2.5, -10.54658257),
        (-7.384796618, 2.5, -10.54658257),
    ]]
    chamfer(chamfer1_edges, length=CHAMFER1_SIZE)


solid = part.part
